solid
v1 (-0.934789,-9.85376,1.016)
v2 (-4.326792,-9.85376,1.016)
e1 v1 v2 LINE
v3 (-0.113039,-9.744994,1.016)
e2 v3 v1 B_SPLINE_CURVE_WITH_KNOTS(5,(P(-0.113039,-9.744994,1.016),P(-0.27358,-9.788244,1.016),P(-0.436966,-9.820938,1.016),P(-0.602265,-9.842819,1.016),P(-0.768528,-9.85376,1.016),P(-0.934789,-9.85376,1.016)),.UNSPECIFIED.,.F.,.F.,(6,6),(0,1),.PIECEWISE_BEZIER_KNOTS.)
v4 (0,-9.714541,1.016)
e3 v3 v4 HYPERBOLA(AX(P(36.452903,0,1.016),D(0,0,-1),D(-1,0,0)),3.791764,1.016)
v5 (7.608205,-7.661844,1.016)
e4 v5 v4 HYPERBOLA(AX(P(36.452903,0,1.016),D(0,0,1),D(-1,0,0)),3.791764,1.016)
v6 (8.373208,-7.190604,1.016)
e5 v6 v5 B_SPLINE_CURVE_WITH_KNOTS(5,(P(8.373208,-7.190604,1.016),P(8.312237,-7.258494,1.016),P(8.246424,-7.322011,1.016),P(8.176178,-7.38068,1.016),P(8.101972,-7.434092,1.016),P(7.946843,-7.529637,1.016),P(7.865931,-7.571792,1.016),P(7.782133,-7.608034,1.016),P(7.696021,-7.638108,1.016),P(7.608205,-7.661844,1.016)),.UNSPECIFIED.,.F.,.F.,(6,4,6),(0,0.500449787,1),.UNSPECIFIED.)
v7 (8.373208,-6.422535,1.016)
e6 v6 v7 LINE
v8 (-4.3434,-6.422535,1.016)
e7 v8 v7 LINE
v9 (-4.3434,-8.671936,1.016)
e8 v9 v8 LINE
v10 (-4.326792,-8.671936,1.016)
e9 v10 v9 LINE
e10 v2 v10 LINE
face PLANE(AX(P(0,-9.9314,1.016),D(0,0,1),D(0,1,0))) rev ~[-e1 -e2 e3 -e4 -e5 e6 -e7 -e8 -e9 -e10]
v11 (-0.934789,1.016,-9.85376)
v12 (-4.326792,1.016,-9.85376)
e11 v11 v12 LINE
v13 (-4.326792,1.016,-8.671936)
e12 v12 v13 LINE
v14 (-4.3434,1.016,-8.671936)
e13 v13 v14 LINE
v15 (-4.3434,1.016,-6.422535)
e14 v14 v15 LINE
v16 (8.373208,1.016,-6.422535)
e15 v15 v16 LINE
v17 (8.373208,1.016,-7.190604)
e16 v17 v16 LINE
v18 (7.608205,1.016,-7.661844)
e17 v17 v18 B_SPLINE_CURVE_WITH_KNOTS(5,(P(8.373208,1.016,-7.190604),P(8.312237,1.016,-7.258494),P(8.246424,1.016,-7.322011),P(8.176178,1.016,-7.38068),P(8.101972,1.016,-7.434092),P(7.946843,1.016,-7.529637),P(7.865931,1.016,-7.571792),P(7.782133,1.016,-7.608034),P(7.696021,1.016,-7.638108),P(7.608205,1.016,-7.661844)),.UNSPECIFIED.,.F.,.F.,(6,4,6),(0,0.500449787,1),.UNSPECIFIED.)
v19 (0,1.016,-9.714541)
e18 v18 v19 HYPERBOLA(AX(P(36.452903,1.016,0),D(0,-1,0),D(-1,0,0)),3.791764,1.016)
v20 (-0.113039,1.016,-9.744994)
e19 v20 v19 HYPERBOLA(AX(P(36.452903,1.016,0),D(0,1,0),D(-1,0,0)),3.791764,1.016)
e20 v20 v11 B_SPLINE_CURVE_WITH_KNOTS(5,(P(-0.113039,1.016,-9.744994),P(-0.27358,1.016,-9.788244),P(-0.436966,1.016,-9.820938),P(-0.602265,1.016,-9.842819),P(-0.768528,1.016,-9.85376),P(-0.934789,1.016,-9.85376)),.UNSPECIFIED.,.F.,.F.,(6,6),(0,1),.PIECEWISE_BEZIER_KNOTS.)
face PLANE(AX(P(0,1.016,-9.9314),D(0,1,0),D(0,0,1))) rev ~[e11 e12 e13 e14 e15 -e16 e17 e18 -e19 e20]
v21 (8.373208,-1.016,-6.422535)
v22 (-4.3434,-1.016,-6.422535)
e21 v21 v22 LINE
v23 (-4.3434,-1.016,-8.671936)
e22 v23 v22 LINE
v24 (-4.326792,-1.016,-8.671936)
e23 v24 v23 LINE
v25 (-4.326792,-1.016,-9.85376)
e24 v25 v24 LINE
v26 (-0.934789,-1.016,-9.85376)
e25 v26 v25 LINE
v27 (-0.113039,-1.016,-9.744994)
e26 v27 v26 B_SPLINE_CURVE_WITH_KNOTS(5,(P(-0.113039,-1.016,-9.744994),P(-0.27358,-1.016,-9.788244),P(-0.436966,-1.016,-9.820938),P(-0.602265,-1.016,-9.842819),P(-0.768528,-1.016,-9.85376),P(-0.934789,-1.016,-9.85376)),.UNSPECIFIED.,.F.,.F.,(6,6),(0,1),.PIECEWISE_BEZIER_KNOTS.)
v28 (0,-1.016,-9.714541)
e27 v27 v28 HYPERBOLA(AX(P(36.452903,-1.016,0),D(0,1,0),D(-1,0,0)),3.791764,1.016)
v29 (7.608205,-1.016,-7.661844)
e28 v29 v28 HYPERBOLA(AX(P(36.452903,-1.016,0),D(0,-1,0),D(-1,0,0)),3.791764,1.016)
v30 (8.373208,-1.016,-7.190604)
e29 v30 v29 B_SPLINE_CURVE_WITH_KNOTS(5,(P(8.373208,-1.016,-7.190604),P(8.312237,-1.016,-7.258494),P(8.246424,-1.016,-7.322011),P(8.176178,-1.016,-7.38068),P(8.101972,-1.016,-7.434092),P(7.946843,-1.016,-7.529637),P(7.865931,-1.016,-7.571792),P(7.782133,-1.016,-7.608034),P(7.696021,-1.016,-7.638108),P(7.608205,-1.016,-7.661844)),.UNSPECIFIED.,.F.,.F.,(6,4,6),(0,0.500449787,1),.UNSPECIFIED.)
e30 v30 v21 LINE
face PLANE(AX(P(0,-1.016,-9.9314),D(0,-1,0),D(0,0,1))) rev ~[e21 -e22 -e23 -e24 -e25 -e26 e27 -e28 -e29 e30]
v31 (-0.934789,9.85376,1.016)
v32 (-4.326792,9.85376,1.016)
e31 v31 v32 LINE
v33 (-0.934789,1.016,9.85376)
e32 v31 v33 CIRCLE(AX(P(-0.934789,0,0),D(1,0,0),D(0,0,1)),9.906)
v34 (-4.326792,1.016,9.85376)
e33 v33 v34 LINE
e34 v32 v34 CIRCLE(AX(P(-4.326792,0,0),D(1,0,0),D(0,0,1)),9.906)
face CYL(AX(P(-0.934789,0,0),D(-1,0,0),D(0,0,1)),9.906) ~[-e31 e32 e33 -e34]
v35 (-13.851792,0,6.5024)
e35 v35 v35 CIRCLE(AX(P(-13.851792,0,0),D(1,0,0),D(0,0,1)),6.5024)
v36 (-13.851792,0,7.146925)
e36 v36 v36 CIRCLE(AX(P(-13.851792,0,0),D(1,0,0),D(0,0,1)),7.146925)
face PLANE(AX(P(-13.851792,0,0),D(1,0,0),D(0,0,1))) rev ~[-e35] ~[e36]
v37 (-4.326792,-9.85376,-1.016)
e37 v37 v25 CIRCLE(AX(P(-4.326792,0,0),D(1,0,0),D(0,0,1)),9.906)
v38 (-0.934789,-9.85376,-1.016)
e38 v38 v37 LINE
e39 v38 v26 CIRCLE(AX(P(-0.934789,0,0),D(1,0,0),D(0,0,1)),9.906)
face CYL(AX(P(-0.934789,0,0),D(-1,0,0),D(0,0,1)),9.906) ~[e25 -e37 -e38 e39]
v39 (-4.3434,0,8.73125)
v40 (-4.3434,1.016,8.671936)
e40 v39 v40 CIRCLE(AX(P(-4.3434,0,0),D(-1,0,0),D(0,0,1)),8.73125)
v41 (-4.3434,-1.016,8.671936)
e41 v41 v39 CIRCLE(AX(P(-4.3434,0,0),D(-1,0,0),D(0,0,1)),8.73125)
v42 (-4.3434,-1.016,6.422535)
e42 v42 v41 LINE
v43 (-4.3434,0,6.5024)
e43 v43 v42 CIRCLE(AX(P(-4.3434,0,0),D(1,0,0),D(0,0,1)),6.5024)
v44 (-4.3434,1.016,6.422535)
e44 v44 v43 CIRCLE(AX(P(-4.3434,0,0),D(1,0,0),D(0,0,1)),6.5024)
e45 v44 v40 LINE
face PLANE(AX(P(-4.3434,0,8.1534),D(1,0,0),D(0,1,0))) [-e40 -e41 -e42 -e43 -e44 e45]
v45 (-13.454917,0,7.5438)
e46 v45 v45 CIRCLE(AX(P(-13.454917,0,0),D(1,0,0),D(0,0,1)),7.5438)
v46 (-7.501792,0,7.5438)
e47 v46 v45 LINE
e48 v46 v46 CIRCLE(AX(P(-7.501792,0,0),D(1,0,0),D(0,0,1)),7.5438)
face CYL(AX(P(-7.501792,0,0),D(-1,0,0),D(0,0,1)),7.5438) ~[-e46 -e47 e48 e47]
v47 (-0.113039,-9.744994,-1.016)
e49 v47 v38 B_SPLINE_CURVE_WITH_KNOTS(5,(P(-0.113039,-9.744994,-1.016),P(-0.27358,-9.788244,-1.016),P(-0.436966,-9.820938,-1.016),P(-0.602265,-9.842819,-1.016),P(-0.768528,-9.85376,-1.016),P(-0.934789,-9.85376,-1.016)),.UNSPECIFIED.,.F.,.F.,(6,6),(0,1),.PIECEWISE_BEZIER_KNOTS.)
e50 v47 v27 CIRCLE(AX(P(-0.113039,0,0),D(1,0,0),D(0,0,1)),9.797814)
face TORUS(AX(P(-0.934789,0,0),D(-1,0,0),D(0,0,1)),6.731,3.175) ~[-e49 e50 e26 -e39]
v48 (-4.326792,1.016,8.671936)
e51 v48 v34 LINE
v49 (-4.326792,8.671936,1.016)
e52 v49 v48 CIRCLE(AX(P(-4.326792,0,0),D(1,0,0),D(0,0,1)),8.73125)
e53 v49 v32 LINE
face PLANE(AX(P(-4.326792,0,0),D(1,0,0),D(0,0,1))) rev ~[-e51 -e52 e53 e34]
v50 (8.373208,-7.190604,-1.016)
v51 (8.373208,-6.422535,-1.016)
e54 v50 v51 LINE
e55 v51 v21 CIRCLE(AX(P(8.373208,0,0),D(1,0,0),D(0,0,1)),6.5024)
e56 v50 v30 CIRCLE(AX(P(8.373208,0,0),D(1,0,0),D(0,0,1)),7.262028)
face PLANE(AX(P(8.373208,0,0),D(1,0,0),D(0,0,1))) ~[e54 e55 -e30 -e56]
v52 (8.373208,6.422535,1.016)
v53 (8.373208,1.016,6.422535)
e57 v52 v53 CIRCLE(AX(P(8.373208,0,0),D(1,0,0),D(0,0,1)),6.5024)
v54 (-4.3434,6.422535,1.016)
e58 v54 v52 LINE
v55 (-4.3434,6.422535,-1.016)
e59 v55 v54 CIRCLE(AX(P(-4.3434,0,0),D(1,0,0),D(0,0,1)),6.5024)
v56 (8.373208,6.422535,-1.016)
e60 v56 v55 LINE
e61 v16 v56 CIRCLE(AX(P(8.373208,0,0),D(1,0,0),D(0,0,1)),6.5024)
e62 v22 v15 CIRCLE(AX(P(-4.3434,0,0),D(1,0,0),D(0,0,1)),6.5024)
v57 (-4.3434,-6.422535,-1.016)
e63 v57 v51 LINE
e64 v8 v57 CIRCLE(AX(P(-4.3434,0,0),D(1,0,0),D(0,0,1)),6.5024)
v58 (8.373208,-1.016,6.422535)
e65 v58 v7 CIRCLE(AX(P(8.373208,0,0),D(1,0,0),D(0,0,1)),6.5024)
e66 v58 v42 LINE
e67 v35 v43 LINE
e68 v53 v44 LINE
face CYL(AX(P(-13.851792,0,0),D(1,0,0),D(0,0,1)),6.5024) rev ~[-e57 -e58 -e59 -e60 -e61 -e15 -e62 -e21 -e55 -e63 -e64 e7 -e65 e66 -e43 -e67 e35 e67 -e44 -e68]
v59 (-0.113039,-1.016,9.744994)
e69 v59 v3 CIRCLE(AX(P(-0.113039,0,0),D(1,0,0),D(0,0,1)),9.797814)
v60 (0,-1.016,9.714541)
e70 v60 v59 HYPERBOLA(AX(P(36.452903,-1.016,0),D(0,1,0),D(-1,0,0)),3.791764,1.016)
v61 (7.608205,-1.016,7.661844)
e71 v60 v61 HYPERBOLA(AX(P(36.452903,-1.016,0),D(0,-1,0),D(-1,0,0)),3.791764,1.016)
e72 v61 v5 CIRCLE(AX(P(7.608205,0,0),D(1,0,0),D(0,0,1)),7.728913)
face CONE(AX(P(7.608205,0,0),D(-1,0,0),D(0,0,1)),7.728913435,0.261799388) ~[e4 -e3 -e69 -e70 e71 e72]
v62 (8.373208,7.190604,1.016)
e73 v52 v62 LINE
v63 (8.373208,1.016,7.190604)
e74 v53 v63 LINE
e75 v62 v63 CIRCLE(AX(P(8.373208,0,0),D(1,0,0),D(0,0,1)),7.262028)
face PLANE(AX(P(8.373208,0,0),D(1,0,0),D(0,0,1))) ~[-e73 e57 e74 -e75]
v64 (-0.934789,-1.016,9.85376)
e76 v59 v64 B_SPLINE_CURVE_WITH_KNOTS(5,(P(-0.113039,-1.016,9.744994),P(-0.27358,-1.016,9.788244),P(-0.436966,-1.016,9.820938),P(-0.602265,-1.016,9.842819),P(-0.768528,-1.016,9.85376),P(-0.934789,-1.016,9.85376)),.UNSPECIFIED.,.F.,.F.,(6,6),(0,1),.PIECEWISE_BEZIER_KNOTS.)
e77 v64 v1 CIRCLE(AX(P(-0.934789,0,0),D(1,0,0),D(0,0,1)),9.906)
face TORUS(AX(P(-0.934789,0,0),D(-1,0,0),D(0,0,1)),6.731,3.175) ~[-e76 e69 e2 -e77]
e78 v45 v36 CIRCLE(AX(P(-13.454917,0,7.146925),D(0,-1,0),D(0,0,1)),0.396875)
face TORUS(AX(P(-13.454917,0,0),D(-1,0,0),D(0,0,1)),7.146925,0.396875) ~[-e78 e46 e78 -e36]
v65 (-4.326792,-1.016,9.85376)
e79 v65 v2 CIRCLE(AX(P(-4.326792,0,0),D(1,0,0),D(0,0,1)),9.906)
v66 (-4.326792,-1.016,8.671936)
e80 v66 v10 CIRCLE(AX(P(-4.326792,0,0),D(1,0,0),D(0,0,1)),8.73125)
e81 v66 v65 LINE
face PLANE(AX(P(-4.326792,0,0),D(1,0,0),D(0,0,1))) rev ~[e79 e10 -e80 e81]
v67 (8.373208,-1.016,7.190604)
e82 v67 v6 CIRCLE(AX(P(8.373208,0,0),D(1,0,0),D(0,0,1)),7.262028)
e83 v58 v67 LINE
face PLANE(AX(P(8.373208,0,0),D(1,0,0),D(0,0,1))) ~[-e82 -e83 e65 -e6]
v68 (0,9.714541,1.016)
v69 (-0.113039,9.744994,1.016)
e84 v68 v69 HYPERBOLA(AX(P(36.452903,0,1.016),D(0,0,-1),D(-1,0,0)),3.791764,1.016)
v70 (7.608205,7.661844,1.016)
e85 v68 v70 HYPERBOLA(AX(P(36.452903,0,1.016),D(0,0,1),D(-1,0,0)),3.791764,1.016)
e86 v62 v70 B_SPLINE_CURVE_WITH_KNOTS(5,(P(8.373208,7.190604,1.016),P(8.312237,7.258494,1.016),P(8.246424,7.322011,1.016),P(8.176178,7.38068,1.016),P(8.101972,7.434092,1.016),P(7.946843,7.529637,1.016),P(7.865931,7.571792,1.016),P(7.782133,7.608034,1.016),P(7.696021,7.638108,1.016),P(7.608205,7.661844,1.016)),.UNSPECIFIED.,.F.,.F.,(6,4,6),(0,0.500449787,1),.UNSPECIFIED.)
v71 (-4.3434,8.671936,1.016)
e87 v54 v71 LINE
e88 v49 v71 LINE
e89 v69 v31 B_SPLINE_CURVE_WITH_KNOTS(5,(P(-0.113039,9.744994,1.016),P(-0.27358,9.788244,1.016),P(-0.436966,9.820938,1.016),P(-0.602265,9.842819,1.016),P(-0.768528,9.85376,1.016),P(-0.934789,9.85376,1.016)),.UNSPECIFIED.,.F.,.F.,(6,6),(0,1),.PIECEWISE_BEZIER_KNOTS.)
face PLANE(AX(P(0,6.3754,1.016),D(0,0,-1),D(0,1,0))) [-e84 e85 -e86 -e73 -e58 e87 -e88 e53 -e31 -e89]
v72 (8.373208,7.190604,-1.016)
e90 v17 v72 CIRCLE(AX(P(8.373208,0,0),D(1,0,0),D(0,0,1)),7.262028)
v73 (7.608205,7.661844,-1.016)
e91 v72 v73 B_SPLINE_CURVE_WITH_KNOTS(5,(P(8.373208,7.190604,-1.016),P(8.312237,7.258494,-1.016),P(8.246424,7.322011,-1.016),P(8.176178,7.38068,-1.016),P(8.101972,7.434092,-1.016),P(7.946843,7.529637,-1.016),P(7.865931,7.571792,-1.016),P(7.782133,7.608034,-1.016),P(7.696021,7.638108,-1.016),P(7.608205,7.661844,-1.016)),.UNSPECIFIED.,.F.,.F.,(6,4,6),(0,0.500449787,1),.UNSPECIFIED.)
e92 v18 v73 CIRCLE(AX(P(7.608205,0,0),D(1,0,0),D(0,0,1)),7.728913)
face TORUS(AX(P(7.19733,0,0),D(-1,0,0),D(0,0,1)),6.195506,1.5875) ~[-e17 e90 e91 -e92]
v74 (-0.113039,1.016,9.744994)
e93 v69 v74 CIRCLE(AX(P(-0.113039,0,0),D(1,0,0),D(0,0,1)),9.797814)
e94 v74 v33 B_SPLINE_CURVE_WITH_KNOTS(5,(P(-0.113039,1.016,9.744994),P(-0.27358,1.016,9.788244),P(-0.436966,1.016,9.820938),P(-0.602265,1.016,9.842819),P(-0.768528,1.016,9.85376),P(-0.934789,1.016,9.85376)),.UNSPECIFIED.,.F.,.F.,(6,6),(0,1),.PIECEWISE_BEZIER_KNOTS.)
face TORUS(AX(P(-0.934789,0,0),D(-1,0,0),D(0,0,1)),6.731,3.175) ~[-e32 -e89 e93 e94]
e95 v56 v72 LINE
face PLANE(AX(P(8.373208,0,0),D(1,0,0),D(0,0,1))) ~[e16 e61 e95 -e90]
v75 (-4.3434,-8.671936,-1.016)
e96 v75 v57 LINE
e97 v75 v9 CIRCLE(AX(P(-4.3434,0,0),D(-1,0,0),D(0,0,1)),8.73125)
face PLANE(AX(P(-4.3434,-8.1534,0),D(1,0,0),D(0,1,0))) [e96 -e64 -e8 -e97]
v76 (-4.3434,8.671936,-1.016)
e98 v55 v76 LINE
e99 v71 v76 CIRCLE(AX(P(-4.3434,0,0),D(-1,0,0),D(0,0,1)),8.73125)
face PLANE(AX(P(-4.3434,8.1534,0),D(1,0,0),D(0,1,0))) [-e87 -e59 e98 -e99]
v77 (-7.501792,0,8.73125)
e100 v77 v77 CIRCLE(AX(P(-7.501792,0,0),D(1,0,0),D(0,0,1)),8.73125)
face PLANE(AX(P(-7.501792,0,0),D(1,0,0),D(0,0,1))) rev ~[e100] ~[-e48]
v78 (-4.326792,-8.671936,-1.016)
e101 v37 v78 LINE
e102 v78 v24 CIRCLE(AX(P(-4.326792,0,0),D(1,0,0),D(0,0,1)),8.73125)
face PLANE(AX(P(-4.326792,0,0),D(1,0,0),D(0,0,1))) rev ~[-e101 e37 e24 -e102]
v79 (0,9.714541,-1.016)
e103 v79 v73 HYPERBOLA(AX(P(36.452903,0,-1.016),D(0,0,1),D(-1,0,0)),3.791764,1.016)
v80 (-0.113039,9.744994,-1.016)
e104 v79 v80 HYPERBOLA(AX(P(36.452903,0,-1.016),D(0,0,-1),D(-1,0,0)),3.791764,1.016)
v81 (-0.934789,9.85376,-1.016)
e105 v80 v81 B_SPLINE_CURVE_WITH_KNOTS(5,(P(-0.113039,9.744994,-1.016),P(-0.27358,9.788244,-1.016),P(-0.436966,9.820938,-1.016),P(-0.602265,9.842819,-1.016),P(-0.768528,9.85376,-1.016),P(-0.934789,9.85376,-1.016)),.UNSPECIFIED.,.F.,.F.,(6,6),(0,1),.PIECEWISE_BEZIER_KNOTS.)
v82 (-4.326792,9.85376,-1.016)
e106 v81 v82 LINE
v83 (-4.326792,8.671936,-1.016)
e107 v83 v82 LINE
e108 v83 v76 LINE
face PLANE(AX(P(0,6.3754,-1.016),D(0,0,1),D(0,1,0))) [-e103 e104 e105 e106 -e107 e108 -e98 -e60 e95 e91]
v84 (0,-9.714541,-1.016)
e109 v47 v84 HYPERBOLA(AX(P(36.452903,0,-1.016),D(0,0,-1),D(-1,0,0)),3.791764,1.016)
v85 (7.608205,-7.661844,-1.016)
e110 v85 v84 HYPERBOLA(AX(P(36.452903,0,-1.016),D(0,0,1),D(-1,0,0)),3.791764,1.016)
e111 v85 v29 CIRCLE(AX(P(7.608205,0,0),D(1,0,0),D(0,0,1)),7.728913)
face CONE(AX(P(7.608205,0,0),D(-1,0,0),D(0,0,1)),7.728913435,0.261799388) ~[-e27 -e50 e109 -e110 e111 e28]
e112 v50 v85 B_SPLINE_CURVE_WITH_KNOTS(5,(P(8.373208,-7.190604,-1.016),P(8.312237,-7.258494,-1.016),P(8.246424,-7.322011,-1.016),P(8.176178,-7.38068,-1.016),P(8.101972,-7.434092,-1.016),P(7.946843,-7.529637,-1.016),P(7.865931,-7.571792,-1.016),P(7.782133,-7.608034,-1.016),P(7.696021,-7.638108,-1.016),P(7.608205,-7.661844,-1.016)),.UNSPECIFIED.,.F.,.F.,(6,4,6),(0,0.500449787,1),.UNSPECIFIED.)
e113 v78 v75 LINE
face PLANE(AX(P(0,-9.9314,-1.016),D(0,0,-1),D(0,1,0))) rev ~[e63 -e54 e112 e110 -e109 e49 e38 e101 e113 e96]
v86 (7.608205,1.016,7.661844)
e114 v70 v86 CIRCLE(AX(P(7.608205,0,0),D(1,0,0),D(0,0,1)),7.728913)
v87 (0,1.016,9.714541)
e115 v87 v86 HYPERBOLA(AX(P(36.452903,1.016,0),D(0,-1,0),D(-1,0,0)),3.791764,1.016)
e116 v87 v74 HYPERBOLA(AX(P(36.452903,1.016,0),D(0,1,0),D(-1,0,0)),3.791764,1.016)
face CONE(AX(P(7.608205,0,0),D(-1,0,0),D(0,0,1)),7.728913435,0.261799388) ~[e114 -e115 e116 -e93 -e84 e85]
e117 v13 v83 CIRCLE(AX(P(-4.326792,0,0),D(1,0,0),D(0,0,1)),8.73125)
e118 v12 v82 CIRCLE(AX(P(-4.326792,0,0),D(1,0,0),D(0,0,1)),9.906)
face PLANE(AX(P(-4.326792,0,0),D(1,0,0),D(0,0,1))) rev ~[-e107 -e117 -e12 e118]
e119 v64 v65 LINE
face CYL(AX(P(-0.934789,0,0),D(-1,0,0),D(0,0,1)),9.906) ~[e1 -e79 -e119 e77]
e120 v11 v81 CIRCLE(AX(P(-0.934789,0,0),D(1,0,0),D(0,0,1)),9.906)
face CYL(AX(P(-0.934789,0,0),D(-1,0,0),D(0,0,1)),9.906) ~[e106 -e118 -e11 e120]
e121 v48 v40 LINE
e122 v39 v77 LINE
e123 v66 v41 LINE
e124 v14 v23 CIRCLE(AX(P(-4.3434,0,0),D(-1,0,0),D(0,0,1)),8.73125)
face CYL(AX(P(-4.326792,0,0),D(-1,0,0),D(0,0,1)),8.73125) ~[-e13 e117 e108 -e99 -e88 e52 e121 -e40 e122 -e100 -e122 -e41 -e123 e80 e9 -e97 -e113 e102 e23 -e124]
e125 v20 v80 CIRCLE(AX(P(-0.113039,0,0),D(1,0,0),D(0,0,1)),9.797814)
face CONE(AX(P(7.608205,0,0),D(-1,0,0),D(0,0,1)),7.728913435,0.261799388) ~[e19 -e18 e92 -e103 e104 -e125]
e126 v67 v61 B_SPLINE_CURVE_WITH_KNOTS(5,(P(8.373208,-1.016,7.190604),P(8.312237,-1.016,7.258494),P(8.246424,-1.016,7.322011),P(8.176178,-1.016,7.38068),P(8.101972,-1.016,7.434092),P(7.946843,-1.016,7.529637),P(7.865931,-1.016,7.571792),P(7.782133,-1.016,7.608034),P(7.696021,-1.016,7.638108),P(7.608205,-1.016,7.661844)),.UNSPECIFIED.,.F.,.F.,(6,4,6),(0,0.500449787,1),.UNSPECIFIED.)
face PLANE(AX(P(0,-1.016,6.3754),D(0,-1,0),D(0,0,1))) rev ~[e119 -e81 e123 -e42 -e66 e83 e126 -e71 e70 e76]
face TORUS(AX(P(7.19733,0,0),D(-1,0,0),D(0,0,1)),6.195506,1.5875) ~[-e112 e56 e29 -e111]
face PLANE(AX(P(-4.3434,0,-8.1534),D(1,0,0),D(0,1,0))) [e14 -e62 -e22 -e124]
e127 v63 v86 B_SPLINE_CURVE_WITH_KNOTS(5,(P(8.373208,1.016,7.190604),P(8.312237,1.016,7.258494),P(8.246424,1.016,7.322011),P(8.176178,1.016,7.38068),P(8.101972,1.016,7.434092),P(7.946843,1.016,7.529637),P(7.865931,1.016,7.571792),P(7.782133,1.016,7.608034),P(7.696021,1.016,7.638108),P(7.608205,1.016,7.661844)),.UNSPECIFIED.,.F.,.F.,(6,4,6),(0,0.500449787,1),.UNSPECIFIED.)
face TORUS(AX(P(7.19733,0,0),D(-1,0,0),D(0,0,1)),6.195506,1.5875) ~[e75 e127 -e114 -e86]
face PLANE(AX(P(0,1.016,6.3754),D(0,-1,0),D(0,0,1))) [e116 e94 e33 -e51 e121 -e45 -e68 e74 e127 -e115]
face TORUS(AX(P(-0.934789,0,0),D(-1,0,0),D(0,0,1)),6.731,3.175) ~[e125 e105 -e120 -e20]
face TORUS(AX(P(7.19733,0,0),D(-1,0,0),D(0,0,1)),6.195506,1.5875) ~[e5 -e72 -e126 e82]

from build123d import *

# Parameters (mm, degrees)
F2_W          = 2.032
F2_H          = 3.556
F2_W_2        = 3.556
F2_H_2        = 2.032
F3_DEPTH      = 25.4
F3_DEPTH_BACK = 4.3434


# Not quite as in the source:
# - a feature names something its author has since deleted; it is built from what else it names


with BuildPart() as f1:
    # F0 (on Front) → F1 (revolve)
    with BuildSketch(Plane.XZ):
        with BuildLine():
            ThreePointArc((8.3732076521, 7.2620277332), (8.0243377529, 7.5505761386), (7.608205325, 7.728913435))
            Line((7.608205325, 7.728913435), (-0.1130385595, 9.7978144985))
            ThreePointArc((-0.1130385595, 9.7978144985), (-0.5203683675, 9.8788374349), (-0.9347890277, 9.906))
            Line((-0.9347890277, 9.906), (-4.3267923479, 9.906))
            Line((-4.3267923479, 9.906), (-4.3267923479, 8.73125))
            Line((-4.3267923479, 8.73125), (-7.5017923479, 8.73125))
            Line((-7.5017923479, 8.73125), (-7.5017923479, 7.5438))
            Line((-7.5017923479, 7.5438), (-13.4549173479, 7.5438))
            ThreePointArc((-13.4549173479, 7.5438), (-13.7355503517, 7.4275580038), (-13.8517923479, 7.146925))
            Line((-13.8517923479, 7.146925), (-13.8517923479, 6.5024))
            Line((-13.8517923479, 6.5024), (8.3732076521, 6.5024))
            Line((8.3732076521, 6.5024), (8.3732076521, 7.2620277332))
        make_face()
    revolve(axis=Axis((-0.2325048039, 0, 0), (1, 0, 0)))

    # F2 (on Right) → F3 (cut, two sides)
    with BuildSketch(Plane.YZ) as f3_sk:
        with Locations((0, -8.1534)):
            Rectangle(F2_W, F2_H)
        with Locations((0, 8.1534)):
            Rectangle(F2_W, F2_H)
        with Locations((-8.1534, 0)):
            Rectangle(F2_W_2, F2_H_2)
        with Locations((8.1534, 0)):
            Rectangle(F2_W_2, F2_H_2)
    extrude(amount=F3_DEPTH, mode=Mode.SUBTRACT)
    extrude(f3_sk.sketch, amount=-F3_DEPTH_BACK, mode=Mode.SUBTRACT)


solid = f1.part
